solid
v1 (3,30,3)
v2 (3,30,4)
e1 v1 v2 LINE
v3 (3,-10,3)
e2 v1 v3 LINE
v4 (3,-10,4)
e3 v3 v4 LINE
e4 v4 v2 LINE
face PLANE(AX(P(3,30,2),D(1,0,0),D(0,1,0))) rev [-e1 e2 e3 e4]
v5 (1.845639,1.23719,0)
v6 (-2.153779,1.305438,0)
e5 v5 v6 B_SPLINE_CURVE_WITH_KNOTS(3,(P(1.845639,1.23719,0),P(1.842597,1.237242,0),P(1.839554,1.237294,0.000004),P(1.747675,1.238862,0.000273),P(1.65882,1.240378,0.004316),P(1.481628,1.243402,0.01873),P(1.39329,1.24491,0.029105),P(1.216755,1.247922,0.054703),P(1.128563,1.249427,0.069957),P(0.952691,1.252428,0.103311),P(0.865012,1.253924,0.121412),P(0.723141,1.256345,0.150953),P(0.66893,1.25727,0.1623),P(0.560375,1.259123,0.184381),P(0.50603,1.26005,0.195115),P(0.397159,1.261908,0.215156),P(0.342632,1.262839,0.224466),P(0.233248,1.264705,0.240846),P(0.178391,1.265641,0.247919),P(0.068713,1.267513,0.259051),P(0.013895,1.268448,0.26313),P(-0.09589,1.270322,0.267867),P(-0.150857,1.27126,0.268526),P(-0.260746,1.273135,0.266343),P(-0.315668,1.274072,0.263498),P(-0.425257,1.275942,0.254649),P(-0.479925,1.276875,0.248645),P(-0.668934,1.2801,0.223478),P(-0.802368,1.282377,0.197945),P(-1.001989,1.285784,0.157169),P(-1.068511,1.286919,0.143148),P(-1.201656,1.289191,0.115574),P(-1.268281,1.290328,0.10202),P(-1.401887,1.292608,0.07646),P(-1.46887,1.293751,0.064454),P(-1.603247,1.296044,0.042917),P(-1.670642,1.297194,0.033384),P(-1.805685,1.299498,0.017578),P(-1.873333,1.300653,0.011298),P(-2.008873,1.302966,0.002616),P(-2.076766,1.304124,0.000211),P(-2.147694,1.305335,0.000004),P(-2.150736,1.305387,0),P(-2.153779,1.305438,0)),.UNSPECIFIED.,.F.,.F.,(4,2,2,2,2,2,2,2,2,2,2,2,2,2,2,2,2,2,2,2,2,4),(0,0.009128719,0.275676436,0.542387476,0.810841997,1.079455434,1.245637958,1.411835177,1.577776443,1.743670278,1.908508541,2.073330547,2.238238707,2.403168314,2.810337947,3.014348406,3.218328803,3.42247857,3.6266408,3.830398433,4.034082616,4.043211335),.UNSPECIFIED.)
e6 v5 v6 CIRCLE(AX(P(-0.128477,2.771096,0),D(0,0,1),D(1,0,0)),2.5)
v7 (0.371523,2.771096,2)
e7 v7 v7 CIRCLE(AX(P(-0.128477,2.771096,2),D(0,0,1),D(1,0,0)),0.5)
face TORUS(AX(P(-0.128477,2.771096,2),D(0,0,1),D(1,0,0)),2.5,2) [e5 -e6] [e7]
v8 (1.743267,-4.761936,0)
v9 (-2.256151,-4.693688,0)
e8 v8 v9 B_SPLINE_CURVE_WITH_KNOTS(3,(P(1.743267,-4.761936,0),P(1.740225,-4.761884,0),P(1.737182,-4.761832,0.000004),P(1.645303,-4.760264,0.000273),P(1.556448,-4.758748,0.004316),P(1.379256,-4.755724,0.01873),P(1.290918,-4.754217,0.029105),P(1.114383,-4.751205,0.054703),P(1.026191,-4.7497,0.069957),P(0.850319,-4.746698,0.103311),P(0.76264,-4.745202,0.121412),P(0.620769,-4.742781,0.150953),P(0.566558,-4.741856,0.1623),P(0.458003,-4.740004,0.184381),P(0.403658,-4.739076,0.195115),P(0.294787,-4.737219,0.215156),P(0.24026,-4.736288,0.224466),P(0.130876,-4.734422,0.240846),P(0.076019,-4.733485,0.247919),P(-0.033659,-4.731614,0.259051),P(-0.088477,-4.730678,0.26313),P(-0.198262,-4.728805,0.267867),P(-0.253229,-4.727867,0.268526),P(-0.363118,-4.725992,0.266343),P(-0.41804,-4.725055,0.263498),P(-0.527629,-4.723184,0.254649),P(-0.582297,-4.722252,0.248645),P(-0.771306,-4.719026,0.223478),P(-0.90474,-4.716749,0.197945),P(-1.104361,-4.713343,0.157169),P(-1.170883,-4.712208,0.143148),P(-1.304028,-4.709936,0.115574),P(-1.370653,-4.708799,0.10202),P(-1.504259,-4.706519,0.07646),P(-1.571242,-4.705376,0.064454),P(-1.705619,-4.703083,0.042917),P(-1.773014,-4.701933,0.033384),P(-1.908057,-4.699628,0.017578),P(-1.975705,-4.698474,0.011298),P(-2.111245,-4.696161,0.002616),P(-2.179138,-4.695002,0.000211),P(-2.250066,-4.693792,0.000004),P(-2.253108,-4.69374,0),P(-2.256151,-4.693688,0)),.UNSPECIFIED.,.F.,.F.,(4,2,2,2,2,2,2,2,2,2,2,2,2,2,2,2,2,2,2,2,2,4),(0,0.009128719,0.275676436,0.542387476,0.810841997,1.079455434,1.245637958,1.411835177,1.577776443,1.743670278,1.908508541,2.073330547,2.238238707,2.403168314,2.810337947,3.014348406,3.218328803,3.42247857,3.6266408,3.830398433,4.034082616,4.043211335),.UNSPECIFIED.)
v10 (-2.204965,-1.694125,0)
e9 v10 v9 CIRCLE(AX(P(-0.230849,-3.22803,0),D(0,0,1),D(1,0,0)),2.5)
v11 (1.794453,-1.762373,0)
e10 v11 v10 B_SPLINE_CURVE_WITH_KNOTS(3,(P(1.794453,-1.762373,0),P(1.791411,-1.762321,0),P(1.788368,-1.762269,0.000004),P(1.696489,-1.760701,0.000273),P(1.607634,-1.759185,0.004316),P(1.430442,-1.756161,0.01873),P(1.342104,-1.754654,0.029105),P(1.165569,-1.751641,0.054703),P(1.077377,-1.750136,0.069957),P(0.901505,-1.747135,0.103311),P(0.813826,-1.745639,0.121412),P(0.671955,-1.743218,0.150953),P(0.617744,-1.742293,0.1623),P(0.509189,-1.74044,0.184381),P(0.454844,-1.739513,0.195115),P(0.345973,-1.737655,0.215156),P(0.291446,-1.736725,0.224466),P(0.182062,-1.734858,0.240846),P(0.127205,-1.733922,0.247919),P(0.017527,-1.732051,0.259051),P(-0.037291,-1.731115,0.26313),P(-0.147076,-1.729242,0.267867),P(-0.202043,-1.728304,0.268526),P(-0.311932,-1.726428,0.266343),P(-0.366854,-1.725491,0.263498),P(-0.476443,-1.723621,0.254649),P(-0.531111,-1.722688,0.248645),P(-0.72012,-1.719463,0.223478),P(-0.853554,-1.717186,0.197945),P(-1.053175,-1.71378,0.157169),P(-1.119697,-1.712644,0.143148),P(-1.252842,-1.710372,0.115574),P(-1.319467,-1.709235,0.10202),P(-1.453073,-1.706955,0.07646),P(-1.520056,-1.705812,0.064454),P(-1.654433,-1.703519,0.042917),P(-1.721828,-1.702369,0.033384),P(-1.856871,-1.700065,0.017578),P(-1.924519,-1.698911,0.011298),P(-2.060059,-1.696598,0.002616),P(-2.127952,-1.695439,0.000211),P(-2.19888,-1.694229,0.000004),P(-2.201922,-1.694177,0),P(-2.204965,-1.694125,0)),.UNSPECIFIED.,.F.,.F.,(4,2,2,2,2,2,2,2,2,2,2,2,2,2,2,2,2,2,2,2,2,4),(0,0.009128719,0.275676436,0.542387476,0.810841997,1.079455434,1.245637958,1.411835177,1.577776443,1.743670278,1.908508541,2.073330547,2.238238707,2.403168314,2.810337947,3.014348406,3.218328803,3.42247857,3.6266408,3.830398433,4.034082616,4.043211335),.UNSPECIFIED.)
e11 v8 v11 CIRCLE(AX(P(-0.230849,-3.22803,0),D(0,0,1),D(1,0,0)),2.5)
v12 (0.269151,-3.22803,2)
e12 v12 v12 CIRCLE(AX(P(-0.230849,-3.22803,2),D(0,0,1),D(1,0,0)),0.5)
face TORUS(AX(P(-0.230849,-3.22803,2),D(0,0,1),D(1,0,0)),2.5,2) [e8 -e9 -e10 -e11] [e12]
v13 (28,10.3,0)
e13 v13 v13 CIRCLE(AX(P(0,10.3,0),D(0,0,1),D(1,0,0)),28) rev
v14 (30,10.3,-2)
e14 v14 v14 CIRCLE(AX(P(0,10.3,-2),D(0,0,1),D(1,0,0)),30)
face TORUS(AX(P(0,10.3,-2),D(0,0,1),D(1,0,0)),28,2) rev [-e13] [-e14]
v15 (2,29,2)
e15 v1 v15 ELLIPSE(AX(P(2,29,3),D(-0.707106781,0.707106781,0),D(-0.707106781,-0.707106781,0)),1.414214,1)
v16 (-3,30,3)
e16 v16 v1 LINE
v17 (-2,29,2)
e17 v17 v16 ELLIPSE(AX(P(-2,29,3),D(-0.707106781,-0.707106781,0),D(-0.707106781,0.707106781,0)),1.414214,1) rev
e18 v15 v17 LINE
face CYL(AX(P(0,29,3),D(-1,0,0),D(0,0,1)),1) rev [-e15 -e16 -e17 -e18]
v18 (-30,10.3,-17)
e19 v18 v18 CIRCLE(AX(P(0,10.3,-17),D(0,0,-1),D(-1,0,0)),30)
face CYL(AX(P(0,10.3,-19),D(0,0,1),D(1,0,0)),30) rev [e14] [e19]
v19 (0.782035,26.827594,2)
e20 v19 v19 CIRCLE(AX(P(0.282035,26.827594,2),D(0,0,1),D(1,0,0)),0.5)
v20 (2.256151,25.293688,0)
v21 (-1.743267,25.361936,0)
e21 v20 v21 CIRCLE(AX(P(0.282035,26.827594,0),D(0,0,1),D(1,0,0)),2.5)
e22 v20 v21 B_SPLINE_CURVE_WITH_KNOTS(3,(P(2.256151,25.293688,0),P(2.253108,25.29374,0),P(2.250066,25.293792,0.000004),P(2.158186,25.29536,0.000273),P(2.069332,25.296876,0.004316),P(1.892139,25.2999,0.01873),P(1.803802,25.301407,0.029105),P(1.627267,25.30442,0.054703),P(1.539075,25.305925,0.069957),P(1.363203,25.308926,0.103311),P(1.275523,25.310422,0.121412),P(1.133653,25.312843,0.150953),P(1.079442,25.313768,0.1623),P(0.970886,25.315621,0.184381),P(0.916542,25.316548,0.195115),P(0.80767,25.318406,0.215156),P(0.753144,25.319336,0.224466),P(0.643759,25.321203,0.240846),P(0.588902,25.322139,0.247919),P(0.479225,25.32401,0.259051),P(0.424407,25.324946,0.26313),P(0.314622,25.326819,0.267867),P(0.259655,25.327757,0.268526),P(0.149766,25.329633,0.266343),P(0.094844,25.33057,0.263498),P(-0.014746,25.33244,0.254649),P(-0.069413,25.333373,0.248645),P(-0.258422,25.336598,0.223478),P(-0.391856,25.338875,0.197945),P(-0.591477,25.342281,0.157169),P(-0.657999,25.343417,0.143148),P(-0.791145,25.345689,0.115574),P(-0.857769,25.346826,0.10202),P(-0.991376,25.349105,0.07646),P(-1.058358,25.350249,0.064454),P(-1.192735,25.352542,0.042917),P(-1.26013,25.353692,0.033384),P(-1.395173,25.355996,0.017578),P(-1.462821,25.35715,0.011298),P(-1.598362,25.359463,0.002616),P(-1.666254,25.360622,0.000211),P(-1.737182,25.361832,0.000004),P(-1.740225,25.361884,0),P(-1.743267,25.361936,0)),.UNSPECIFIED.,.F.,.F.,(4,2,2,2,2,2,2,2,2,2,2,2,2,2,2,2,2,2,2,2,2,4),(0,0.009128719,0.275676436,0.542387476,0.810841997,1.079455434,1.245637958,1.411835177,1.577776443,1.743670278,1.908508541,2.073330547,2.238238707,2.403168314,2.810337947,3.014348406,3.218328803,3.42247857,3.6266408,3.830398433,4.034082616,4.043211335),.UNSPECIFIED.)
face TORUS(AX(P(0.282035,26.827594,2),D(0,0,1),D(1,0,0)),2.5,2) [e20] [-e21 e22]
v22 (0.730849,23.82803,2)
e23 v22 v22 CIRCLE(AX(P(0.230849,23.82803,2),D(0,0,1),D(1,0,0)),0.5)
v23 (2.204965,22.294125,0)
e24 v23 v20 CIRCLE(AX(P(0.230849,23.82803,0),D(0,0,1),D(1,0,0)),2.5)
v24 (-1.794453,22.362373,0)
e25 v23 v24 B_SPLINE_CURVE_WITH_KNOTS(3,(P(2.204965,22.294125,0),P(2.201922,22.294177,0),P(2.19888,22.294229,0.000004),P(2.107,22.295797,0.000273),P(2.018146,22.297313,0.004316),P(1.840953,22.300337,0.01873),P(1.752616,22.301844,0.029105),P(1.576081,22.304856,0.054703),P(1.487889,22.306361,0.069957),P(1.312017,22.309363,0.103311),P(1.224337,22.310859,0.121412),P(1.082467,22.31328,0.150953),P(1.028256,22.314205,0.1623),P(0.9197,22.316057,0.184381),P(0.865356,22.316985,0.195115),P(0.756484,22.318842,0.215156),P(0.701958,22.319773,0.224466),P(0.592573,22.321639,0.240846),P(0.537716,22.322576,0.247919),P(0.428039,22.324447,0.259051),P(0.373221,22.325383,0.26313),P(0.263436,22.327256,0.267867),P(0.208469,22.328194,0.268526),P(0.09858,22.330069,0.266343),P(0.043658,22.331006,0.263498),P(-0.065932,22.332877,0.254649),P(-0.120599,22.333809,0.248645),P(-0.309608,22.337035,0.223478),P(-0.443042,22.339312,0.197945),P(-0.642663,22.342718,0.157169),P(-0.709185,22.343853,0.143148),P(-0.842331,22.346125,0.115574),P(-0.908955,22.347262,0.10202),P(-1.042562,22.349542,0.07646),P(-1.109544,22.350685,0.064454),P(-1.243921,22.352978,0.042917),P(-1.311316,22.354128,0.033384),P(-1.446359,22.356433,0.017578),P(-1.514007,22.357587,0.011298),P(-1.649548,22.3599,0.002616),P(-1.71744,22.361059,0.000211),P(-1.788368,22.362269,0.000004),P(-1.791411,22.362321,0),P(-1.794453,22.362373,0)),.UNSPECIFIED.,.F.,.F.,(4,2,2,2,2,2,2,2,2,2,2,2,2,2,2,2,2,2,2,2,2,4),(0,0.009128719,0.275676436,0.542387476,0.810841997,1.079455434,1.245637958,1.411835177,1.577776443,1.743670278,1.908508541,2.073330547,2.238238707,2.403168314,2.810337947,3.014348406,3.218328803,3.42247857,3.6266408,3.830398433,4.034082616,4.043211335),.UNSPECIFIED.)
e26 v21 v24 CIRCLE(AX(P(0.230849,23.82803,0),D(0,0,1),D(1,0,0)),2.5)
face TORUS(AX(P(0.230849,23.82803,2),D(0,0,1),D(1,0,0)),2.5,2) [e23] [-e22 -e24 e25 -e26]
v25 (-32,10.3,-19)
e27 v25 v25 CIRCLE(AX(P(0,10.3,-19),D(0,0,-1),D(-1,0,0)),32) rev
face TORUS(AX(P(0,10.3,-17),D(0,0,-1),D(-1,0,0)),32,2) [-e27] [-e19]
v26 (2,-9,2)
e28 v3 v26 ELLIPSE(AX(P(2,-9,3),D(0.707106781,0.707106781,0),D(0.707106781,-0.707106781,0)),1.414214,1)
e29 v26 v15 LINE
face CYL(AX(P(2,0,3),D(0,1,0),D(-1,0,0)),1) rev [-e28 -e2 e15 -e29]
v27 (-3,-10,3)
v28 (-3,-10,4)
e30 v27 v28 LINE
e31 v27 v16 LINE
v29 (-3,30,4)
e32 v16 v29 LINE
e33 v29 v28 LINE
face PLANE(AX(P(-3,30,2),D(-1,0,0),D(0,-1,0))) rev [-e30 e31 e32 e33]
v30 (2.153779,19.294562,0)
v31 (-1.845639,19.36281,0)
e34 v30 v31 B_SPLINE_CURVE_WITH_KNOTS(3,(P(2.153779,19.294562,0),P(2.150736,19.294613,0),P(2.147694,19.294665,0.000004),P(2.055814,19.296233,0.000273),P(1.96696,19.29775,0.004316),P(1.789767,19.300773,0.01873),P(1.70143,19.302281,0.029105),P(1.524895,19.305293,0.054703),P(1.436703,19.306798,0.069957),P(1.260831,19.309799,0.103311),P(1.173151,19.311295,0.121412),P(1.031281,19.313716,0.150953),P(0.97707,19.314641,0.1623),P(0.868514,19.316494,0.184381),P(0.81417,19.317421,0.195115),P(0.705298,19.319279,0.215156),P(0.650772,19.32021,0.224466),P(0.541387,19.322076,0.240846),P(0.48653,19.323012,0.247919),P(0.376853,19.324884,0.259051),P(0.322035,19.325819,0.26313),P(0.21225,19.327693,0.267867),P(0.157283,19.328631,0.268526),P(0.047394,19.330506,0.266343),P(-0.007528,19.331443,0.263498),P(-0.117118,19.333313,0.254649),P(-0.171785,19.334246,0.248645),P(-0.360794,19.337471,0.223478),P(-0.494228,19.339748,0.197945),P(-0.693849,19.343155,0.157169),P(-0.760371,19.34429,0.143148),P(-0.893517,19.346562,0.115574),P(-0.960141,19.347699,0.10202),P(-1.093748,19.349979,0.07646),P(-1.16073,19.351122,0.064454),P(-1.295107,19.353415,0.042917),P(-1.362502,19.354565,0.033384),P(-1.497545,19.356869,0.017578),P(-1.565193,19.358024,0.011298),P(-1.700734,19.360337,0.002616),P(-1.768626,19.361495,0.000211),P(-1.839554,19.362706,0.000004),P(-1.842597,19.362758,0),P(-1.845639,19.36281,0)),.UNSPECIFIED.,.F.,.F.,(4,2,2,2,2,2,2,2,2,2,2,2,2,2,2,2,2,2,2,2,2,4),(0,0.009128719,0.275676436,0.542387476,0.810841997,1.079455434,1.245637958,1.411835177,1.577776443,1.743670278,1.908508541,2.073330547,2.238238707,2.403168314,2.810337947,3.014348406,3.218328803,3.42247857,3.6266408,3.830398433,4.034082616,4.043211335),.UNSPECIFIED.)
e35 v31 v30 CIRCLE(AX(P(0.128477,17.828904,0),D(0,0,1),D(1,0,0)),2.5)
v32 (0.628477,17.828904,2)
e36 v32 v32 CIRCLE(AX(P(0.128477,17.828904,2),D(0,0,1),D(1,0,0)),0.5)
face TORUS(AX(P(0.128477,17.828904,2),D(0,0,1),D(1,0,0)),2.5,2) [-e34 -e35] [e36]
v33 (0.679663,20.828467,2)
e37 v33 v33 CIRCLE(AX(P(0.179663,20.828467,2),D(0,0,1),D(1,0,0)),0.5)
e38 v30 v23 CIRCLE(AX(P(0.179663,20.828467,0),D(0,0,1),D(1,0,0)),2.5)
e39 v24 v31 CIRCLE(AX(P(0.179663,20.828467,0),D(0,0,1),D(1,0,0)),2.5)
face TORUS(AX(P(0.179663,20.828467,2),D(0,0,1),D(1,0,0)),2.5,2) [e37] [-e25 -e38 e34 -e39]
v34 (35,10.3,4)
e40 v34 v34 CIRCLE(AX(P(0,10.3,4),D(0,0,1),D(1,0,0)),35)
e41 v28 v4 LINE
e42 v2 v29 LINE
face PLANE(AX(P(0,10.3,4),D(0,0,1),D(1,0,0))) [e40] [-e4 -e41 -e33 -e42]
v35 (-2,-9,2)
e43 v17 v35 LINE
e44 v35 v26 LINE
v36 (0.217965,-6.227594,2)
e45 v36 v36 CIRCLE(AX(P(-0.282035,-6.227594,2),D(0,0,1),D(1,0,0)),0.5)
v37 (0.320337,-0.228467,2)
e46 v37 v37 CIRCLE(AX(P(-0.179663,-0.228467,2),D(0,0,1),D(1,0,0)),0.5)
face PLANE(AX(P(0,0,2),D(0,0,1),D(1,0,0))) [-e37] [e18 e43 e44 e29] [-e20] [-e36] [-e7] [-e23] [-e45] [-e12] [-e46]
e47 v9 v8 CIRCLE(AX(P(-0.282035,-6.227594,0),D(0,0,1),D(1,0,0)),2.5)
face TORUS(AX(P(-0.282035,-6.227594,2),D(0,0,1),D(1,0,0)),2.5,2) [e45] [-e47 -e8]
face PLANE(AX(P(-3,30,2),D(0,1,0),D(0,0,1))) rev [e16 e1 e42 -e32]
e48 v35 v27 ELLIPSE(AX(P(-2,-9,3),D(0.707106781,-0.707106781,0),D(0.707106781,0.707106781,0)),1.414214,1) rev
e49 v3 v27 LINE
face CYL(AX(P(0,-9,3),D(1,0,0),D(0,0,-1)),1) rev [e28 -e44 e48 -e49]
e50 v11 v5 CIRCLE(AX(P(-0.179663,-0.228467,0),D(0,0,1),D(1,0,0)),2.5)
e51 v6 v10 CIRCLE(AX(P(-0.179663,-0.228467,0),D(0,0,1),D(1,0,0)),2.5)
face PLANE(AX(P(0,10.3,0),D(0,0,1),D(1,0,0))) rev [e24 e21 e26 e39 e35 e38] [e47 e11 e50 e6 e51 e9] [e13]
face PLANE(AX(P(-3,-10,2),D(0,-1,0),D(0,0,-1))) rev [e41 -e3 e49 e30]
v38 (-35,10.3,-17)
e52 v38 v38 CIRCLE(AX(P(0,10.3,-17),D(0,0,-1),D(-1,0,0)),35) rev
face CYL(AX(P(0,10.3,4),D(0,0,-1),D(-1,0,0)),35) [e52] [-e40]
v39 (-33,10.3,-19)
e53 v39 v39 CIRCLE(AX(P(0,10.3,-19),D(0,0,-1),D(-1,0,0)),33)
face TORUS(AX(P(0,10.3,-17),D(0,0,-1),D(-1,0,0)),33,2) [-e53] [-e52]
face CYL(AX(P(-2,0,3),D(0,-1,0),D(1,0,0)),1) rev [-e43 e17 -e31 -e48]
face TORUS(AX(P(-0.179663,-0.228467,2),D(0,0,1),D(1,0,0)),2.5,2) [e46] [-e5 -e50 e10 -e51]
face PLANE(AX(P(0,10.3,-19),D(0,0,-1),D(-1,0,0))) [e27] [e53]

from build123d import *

# Parameters (mm, degrees)
SKETCH1_R           = 35
SKETCH1_R_2         = 0.5
BOSS_EXTRUDE1_DEPTH = 4
SKETCH2_W           = 6
SKETCH2_H           = 40
CUT_EXTRUDE1_DEPTH  = 2
FILLET1_R           = 1
EXTRUDE_THIN1_START = 19
SKETCH3_R           = 35
SKETCH3_R_2         = 30
EXTRUDE_THIN1_DEPTH = 19
FILLET2_R           = 2
FILLET3_R           = 2


with BuildPart() as part:
    # Sketch1 → Boss-Extrude1 (new body)
    with BuildSketch(Plane.XY):
        with Locations((0, 10.3)):
            Circle(SKETCH1_R)
        with Locations((0.282034844, 26.827593786)):
            Circle(SKETCH1_R_2, mode=Mode.SUBTRACT)
        with Locations((0.230848847, 23.828030485)):
            Circle(SKETCH1_R_2, mode=Mode.SUBTRACT)
        with Locations((0.17966285, 20.828467185)):
            Circle(SKETCH1_R_2, mode=Mode.SUBTRACT)
        with Locations((0.128476853, 17.828903884)):
            Circle(SKETCH1_R_2, mode=Mode.SUBTRACT)
        with Locations((-0.128476853, 2.771096116)):
            Circle(SKETCH1_R_2, mode=Mode.SUBTRACT)
        with Locations((-0.17966285, -0.228467185)):
            Circle(SKETCH1_R_2, mode=Mode.SUBTRACT)
        with Locations((-0.230848847, -3.228030485)):
            Circle(SKETCH1_R_2, mode=Mode.SUBTRACT)
        with Locations((-0.282034844, -6.227593786)):
            Circle(SKETCH1_R_2, mode=Mode.SUBTRACT)
    extrude(amount=BOSS_EXTRUDE1_DEPTH)

    # Sketch2 → Cut-Extrude1 (cut)
    with BuildSketch(Plane.XY.offset(4)):
        with Locations((0, 10)):
            Rectangle(SKETCH2_W, SKETCH2_H)
    extrude(amount=-CUT_EXTRUDE1_DEPTH, mode=Mode.SUBTRACT)

    # Fillet1
    fillet1_edges = [part.edges().sort_by_distance(p)[0] for p in [
        (-3, 10, 2),
        (0, 30, 2),
        (3, 10, 2),
        (0, -10, 2),
    ]]
    fillet(fillet1_edges, radius=FILLET1_R)

    # Sketch3 → Extrude-Thin1 (add)
    with BuildSketch(Plane(origin=(0, 0, 0), x_dir=(-1, 0, 0), z_dir=(0, 0, -1)).offset(EXTRUDE_THIN1_START)):
        with Locations((0, 10.3)):
            Circle(SKETCH3_R)
        with Locations((0, 10.3)):
            Circle(SKETCH3_R_2, mode=Mode.SUBTRACT)
    extrude(amount=-EXTRUDE_THIN1_DEPTH)

    # Fillet2
    # the kernel refuses this fillet: 2 mm, written as the material it adds along each edge
    with BuildSketch(Plane(origin=(0, 10.3, 0), x_dir=(-1, 0, 0), z_dir=(0, -1, 0))) as fillet2_piece_1:
        with BuildLine():
            CenterArc((30 - FILLET2_R, FILLET2_R), FILLET2_R, 270, 90)
            Line((30, FILLET2_R), (30, 0))
            Line((30, 0), (30 - FILLET2_R, 0))
        make_face()
    revolve(axis=Axis((0, 10.3, 0), (0, 0, -1)))
    # the kernel refuses this fillet: 2 mm, written as the material it takes off along each edge
    with BuildSketch(Plane(origin=(0.17966285, 20.828467185, 0), x_dir=(1, 0, 0), z_dir=(0, -1, 0))) as fillet2_2_piece_1:
        with BuildLine():
            CenterArc((0.5 + FILLET2_R, FILLET2_R), FILLET2_R, 180, 90)
            Line((0.5 + FILLET2_R, 0), (0.5, 0))
            Line((0.5, 0), (0.5, FILLET2_R))
        make_face()
    revolve(axis=Axis((0.17966285, 20.828467185, 0), (0, 0, 1)), mode=Mode.SUBTRACT)
    with BuildSketch(Plane(origin=(0.128476853, 17.828903884, 0), x_dir=(1, 0, 0), z_dir=(0, -1, 0))) as fillet2_2_piece_2:
        with BuildLine():
            CenterArc((0.5 + FILLET2_R, FILLET2_R), FILLET2_R, 180, 90)
            Line((0.5 + FILLET2_R, 0), (0.5, 0))
            Line((0.5, 0), (0.5, FILLET2_R))
        make_face()
    revolve(axis=Axis((0.128476853, 17.828903884, 0), (0, 0, 1)), mode=Mode.SUBTRACT)
    with BuildSketch(Plane(origin=(-0.128476853, 2.771096116, 0), x_dir=(1, 0, 0), z_dir=(0, -1, 0))) as fillet2_2_piece_3:
        with BuildLine():
            CenterArc((0.5 + FILLET2_R, FILLET2_R), FILLET2_R, 180, 90)
            Line((0.5 + FILLET2_R, 0), (0.5, 0))
            Line((0.5, 0), (0.5, FILLET2_R))
        make_face()
    revolve(axis=Axis((-0.128476853, 2.771096116, 0), (0, 0, 1)), mode=Mode.SUBTRACT)
    with BuildSketch(Plane(origin=(-0.17966285, -0.228467185, 0), x_dir=(1, 0, 0), z_dir=(0, -1, 0))) as fillet2_2_piece_4:
        with BuildLine():
            CenterArc((0.5 + FILLET2_R, FILLET2_R), FILLET2_R, 180, 90)
            Line((0.5 + FILLET2_R, 0), (0.5, 0))
            Line((0.5, 0), (0.5, FILLET2_R))
        make_face()
    revolve(axis=Axis((-0.17966285, -0.228467185, 0), (0, 0, 1)), mode=Mode.SUBTRACT)
    with BuildSketch(Plane(origin=(-0.230848847, -3.228030485, 0), x_dir=(1, 0, 0), z_dir=(0, -1, 0))) as fillet2_2_piece_5:
        with BuildLine():
            CenterArc((0.5 + FILLET2_R, FILLET2_R), FILLET2_R, 180, 90)
            Line((0.5 + FILLET2_R, 0), (0.5, 0))
            Line((0.5, 0), (0.5, FILLET2_R))
        make_face()
    revolve(axis=Axis((-0.230848847, -3.228030485, 0), (0, 0, 1)), mode=Mode.SUBTRACT)
    with BuildSketch(Plane(origin=(-0.282034844, -6.227593786, 0), x_dir=(1, 0, 0), z_dir=(0, -1, 0))) as fillet2_2_piece_6:
        with BuildLine():
            CenterArc((0.5 + FILLET2_R, FILLET2_R), FILLET2_R, 180, 90)
            Line((0.5 + FILLET2_R, 0), (0.5, 0))
            Line((0.5, 0), (0.5, FILLET2_R))
        make_face()
    revolve(axis=Axis((-0.282034844, -6.227593786, 0), (0, 0, 1)), mode=Mode.SUBTRACT)
    with BuildSketch(Plane(origin=(0.282034844, 26.827593786, 0), x_dir=(1, 0, 0), z_dir=(0, -1, 0))) as fillet2_2_piece_7:
        with BuildLine():
            CenterArc((0.5 + FILLET2_R, FILLET2_R), FILLET2_R, 180, 90)
            Line((0.5 + FILLET2_R, 0), (0.5, 0))
            Line((0.5, 0), (0.5, FILLET2_R))
        make_face()
    revolve(axis=Axis((0.282034844, 26.827593786, 0), (0, 0, 1)), mode=Mode.SUBTRACT)
    with BuildSketch(Plane(origin=(0.230848847, 23.828030485, 0), x_dir=(1, 0, 0), z_dir=(0, -1, 0))) as fillet2_2_piece_8:
        with BuildLine():
            CenterArc((0.5 + FILLET2_R, FILLET2_R), FILLET2_R, 180, 90)
            Line((0.5 + FILLET2_R, 0), (0.5, 0))
            Line((0.5, 0), (0.5, FILLET2_R))
        make_face()
    revolve(axis=Axis((0.230848847, 23.828030485, 0), (0, 0, 1)), mode=Mode.SUBTRACT)

    # Fillet3
    fillet3_edges = [part.edges().sort_by_distance(p)[0] for p in [
        (35, 10.3, -19),
        (30, 10.3, -19),
    ]]
    fillet(fillet3_edges, radius=FILLET3_R)


solid = part.part
